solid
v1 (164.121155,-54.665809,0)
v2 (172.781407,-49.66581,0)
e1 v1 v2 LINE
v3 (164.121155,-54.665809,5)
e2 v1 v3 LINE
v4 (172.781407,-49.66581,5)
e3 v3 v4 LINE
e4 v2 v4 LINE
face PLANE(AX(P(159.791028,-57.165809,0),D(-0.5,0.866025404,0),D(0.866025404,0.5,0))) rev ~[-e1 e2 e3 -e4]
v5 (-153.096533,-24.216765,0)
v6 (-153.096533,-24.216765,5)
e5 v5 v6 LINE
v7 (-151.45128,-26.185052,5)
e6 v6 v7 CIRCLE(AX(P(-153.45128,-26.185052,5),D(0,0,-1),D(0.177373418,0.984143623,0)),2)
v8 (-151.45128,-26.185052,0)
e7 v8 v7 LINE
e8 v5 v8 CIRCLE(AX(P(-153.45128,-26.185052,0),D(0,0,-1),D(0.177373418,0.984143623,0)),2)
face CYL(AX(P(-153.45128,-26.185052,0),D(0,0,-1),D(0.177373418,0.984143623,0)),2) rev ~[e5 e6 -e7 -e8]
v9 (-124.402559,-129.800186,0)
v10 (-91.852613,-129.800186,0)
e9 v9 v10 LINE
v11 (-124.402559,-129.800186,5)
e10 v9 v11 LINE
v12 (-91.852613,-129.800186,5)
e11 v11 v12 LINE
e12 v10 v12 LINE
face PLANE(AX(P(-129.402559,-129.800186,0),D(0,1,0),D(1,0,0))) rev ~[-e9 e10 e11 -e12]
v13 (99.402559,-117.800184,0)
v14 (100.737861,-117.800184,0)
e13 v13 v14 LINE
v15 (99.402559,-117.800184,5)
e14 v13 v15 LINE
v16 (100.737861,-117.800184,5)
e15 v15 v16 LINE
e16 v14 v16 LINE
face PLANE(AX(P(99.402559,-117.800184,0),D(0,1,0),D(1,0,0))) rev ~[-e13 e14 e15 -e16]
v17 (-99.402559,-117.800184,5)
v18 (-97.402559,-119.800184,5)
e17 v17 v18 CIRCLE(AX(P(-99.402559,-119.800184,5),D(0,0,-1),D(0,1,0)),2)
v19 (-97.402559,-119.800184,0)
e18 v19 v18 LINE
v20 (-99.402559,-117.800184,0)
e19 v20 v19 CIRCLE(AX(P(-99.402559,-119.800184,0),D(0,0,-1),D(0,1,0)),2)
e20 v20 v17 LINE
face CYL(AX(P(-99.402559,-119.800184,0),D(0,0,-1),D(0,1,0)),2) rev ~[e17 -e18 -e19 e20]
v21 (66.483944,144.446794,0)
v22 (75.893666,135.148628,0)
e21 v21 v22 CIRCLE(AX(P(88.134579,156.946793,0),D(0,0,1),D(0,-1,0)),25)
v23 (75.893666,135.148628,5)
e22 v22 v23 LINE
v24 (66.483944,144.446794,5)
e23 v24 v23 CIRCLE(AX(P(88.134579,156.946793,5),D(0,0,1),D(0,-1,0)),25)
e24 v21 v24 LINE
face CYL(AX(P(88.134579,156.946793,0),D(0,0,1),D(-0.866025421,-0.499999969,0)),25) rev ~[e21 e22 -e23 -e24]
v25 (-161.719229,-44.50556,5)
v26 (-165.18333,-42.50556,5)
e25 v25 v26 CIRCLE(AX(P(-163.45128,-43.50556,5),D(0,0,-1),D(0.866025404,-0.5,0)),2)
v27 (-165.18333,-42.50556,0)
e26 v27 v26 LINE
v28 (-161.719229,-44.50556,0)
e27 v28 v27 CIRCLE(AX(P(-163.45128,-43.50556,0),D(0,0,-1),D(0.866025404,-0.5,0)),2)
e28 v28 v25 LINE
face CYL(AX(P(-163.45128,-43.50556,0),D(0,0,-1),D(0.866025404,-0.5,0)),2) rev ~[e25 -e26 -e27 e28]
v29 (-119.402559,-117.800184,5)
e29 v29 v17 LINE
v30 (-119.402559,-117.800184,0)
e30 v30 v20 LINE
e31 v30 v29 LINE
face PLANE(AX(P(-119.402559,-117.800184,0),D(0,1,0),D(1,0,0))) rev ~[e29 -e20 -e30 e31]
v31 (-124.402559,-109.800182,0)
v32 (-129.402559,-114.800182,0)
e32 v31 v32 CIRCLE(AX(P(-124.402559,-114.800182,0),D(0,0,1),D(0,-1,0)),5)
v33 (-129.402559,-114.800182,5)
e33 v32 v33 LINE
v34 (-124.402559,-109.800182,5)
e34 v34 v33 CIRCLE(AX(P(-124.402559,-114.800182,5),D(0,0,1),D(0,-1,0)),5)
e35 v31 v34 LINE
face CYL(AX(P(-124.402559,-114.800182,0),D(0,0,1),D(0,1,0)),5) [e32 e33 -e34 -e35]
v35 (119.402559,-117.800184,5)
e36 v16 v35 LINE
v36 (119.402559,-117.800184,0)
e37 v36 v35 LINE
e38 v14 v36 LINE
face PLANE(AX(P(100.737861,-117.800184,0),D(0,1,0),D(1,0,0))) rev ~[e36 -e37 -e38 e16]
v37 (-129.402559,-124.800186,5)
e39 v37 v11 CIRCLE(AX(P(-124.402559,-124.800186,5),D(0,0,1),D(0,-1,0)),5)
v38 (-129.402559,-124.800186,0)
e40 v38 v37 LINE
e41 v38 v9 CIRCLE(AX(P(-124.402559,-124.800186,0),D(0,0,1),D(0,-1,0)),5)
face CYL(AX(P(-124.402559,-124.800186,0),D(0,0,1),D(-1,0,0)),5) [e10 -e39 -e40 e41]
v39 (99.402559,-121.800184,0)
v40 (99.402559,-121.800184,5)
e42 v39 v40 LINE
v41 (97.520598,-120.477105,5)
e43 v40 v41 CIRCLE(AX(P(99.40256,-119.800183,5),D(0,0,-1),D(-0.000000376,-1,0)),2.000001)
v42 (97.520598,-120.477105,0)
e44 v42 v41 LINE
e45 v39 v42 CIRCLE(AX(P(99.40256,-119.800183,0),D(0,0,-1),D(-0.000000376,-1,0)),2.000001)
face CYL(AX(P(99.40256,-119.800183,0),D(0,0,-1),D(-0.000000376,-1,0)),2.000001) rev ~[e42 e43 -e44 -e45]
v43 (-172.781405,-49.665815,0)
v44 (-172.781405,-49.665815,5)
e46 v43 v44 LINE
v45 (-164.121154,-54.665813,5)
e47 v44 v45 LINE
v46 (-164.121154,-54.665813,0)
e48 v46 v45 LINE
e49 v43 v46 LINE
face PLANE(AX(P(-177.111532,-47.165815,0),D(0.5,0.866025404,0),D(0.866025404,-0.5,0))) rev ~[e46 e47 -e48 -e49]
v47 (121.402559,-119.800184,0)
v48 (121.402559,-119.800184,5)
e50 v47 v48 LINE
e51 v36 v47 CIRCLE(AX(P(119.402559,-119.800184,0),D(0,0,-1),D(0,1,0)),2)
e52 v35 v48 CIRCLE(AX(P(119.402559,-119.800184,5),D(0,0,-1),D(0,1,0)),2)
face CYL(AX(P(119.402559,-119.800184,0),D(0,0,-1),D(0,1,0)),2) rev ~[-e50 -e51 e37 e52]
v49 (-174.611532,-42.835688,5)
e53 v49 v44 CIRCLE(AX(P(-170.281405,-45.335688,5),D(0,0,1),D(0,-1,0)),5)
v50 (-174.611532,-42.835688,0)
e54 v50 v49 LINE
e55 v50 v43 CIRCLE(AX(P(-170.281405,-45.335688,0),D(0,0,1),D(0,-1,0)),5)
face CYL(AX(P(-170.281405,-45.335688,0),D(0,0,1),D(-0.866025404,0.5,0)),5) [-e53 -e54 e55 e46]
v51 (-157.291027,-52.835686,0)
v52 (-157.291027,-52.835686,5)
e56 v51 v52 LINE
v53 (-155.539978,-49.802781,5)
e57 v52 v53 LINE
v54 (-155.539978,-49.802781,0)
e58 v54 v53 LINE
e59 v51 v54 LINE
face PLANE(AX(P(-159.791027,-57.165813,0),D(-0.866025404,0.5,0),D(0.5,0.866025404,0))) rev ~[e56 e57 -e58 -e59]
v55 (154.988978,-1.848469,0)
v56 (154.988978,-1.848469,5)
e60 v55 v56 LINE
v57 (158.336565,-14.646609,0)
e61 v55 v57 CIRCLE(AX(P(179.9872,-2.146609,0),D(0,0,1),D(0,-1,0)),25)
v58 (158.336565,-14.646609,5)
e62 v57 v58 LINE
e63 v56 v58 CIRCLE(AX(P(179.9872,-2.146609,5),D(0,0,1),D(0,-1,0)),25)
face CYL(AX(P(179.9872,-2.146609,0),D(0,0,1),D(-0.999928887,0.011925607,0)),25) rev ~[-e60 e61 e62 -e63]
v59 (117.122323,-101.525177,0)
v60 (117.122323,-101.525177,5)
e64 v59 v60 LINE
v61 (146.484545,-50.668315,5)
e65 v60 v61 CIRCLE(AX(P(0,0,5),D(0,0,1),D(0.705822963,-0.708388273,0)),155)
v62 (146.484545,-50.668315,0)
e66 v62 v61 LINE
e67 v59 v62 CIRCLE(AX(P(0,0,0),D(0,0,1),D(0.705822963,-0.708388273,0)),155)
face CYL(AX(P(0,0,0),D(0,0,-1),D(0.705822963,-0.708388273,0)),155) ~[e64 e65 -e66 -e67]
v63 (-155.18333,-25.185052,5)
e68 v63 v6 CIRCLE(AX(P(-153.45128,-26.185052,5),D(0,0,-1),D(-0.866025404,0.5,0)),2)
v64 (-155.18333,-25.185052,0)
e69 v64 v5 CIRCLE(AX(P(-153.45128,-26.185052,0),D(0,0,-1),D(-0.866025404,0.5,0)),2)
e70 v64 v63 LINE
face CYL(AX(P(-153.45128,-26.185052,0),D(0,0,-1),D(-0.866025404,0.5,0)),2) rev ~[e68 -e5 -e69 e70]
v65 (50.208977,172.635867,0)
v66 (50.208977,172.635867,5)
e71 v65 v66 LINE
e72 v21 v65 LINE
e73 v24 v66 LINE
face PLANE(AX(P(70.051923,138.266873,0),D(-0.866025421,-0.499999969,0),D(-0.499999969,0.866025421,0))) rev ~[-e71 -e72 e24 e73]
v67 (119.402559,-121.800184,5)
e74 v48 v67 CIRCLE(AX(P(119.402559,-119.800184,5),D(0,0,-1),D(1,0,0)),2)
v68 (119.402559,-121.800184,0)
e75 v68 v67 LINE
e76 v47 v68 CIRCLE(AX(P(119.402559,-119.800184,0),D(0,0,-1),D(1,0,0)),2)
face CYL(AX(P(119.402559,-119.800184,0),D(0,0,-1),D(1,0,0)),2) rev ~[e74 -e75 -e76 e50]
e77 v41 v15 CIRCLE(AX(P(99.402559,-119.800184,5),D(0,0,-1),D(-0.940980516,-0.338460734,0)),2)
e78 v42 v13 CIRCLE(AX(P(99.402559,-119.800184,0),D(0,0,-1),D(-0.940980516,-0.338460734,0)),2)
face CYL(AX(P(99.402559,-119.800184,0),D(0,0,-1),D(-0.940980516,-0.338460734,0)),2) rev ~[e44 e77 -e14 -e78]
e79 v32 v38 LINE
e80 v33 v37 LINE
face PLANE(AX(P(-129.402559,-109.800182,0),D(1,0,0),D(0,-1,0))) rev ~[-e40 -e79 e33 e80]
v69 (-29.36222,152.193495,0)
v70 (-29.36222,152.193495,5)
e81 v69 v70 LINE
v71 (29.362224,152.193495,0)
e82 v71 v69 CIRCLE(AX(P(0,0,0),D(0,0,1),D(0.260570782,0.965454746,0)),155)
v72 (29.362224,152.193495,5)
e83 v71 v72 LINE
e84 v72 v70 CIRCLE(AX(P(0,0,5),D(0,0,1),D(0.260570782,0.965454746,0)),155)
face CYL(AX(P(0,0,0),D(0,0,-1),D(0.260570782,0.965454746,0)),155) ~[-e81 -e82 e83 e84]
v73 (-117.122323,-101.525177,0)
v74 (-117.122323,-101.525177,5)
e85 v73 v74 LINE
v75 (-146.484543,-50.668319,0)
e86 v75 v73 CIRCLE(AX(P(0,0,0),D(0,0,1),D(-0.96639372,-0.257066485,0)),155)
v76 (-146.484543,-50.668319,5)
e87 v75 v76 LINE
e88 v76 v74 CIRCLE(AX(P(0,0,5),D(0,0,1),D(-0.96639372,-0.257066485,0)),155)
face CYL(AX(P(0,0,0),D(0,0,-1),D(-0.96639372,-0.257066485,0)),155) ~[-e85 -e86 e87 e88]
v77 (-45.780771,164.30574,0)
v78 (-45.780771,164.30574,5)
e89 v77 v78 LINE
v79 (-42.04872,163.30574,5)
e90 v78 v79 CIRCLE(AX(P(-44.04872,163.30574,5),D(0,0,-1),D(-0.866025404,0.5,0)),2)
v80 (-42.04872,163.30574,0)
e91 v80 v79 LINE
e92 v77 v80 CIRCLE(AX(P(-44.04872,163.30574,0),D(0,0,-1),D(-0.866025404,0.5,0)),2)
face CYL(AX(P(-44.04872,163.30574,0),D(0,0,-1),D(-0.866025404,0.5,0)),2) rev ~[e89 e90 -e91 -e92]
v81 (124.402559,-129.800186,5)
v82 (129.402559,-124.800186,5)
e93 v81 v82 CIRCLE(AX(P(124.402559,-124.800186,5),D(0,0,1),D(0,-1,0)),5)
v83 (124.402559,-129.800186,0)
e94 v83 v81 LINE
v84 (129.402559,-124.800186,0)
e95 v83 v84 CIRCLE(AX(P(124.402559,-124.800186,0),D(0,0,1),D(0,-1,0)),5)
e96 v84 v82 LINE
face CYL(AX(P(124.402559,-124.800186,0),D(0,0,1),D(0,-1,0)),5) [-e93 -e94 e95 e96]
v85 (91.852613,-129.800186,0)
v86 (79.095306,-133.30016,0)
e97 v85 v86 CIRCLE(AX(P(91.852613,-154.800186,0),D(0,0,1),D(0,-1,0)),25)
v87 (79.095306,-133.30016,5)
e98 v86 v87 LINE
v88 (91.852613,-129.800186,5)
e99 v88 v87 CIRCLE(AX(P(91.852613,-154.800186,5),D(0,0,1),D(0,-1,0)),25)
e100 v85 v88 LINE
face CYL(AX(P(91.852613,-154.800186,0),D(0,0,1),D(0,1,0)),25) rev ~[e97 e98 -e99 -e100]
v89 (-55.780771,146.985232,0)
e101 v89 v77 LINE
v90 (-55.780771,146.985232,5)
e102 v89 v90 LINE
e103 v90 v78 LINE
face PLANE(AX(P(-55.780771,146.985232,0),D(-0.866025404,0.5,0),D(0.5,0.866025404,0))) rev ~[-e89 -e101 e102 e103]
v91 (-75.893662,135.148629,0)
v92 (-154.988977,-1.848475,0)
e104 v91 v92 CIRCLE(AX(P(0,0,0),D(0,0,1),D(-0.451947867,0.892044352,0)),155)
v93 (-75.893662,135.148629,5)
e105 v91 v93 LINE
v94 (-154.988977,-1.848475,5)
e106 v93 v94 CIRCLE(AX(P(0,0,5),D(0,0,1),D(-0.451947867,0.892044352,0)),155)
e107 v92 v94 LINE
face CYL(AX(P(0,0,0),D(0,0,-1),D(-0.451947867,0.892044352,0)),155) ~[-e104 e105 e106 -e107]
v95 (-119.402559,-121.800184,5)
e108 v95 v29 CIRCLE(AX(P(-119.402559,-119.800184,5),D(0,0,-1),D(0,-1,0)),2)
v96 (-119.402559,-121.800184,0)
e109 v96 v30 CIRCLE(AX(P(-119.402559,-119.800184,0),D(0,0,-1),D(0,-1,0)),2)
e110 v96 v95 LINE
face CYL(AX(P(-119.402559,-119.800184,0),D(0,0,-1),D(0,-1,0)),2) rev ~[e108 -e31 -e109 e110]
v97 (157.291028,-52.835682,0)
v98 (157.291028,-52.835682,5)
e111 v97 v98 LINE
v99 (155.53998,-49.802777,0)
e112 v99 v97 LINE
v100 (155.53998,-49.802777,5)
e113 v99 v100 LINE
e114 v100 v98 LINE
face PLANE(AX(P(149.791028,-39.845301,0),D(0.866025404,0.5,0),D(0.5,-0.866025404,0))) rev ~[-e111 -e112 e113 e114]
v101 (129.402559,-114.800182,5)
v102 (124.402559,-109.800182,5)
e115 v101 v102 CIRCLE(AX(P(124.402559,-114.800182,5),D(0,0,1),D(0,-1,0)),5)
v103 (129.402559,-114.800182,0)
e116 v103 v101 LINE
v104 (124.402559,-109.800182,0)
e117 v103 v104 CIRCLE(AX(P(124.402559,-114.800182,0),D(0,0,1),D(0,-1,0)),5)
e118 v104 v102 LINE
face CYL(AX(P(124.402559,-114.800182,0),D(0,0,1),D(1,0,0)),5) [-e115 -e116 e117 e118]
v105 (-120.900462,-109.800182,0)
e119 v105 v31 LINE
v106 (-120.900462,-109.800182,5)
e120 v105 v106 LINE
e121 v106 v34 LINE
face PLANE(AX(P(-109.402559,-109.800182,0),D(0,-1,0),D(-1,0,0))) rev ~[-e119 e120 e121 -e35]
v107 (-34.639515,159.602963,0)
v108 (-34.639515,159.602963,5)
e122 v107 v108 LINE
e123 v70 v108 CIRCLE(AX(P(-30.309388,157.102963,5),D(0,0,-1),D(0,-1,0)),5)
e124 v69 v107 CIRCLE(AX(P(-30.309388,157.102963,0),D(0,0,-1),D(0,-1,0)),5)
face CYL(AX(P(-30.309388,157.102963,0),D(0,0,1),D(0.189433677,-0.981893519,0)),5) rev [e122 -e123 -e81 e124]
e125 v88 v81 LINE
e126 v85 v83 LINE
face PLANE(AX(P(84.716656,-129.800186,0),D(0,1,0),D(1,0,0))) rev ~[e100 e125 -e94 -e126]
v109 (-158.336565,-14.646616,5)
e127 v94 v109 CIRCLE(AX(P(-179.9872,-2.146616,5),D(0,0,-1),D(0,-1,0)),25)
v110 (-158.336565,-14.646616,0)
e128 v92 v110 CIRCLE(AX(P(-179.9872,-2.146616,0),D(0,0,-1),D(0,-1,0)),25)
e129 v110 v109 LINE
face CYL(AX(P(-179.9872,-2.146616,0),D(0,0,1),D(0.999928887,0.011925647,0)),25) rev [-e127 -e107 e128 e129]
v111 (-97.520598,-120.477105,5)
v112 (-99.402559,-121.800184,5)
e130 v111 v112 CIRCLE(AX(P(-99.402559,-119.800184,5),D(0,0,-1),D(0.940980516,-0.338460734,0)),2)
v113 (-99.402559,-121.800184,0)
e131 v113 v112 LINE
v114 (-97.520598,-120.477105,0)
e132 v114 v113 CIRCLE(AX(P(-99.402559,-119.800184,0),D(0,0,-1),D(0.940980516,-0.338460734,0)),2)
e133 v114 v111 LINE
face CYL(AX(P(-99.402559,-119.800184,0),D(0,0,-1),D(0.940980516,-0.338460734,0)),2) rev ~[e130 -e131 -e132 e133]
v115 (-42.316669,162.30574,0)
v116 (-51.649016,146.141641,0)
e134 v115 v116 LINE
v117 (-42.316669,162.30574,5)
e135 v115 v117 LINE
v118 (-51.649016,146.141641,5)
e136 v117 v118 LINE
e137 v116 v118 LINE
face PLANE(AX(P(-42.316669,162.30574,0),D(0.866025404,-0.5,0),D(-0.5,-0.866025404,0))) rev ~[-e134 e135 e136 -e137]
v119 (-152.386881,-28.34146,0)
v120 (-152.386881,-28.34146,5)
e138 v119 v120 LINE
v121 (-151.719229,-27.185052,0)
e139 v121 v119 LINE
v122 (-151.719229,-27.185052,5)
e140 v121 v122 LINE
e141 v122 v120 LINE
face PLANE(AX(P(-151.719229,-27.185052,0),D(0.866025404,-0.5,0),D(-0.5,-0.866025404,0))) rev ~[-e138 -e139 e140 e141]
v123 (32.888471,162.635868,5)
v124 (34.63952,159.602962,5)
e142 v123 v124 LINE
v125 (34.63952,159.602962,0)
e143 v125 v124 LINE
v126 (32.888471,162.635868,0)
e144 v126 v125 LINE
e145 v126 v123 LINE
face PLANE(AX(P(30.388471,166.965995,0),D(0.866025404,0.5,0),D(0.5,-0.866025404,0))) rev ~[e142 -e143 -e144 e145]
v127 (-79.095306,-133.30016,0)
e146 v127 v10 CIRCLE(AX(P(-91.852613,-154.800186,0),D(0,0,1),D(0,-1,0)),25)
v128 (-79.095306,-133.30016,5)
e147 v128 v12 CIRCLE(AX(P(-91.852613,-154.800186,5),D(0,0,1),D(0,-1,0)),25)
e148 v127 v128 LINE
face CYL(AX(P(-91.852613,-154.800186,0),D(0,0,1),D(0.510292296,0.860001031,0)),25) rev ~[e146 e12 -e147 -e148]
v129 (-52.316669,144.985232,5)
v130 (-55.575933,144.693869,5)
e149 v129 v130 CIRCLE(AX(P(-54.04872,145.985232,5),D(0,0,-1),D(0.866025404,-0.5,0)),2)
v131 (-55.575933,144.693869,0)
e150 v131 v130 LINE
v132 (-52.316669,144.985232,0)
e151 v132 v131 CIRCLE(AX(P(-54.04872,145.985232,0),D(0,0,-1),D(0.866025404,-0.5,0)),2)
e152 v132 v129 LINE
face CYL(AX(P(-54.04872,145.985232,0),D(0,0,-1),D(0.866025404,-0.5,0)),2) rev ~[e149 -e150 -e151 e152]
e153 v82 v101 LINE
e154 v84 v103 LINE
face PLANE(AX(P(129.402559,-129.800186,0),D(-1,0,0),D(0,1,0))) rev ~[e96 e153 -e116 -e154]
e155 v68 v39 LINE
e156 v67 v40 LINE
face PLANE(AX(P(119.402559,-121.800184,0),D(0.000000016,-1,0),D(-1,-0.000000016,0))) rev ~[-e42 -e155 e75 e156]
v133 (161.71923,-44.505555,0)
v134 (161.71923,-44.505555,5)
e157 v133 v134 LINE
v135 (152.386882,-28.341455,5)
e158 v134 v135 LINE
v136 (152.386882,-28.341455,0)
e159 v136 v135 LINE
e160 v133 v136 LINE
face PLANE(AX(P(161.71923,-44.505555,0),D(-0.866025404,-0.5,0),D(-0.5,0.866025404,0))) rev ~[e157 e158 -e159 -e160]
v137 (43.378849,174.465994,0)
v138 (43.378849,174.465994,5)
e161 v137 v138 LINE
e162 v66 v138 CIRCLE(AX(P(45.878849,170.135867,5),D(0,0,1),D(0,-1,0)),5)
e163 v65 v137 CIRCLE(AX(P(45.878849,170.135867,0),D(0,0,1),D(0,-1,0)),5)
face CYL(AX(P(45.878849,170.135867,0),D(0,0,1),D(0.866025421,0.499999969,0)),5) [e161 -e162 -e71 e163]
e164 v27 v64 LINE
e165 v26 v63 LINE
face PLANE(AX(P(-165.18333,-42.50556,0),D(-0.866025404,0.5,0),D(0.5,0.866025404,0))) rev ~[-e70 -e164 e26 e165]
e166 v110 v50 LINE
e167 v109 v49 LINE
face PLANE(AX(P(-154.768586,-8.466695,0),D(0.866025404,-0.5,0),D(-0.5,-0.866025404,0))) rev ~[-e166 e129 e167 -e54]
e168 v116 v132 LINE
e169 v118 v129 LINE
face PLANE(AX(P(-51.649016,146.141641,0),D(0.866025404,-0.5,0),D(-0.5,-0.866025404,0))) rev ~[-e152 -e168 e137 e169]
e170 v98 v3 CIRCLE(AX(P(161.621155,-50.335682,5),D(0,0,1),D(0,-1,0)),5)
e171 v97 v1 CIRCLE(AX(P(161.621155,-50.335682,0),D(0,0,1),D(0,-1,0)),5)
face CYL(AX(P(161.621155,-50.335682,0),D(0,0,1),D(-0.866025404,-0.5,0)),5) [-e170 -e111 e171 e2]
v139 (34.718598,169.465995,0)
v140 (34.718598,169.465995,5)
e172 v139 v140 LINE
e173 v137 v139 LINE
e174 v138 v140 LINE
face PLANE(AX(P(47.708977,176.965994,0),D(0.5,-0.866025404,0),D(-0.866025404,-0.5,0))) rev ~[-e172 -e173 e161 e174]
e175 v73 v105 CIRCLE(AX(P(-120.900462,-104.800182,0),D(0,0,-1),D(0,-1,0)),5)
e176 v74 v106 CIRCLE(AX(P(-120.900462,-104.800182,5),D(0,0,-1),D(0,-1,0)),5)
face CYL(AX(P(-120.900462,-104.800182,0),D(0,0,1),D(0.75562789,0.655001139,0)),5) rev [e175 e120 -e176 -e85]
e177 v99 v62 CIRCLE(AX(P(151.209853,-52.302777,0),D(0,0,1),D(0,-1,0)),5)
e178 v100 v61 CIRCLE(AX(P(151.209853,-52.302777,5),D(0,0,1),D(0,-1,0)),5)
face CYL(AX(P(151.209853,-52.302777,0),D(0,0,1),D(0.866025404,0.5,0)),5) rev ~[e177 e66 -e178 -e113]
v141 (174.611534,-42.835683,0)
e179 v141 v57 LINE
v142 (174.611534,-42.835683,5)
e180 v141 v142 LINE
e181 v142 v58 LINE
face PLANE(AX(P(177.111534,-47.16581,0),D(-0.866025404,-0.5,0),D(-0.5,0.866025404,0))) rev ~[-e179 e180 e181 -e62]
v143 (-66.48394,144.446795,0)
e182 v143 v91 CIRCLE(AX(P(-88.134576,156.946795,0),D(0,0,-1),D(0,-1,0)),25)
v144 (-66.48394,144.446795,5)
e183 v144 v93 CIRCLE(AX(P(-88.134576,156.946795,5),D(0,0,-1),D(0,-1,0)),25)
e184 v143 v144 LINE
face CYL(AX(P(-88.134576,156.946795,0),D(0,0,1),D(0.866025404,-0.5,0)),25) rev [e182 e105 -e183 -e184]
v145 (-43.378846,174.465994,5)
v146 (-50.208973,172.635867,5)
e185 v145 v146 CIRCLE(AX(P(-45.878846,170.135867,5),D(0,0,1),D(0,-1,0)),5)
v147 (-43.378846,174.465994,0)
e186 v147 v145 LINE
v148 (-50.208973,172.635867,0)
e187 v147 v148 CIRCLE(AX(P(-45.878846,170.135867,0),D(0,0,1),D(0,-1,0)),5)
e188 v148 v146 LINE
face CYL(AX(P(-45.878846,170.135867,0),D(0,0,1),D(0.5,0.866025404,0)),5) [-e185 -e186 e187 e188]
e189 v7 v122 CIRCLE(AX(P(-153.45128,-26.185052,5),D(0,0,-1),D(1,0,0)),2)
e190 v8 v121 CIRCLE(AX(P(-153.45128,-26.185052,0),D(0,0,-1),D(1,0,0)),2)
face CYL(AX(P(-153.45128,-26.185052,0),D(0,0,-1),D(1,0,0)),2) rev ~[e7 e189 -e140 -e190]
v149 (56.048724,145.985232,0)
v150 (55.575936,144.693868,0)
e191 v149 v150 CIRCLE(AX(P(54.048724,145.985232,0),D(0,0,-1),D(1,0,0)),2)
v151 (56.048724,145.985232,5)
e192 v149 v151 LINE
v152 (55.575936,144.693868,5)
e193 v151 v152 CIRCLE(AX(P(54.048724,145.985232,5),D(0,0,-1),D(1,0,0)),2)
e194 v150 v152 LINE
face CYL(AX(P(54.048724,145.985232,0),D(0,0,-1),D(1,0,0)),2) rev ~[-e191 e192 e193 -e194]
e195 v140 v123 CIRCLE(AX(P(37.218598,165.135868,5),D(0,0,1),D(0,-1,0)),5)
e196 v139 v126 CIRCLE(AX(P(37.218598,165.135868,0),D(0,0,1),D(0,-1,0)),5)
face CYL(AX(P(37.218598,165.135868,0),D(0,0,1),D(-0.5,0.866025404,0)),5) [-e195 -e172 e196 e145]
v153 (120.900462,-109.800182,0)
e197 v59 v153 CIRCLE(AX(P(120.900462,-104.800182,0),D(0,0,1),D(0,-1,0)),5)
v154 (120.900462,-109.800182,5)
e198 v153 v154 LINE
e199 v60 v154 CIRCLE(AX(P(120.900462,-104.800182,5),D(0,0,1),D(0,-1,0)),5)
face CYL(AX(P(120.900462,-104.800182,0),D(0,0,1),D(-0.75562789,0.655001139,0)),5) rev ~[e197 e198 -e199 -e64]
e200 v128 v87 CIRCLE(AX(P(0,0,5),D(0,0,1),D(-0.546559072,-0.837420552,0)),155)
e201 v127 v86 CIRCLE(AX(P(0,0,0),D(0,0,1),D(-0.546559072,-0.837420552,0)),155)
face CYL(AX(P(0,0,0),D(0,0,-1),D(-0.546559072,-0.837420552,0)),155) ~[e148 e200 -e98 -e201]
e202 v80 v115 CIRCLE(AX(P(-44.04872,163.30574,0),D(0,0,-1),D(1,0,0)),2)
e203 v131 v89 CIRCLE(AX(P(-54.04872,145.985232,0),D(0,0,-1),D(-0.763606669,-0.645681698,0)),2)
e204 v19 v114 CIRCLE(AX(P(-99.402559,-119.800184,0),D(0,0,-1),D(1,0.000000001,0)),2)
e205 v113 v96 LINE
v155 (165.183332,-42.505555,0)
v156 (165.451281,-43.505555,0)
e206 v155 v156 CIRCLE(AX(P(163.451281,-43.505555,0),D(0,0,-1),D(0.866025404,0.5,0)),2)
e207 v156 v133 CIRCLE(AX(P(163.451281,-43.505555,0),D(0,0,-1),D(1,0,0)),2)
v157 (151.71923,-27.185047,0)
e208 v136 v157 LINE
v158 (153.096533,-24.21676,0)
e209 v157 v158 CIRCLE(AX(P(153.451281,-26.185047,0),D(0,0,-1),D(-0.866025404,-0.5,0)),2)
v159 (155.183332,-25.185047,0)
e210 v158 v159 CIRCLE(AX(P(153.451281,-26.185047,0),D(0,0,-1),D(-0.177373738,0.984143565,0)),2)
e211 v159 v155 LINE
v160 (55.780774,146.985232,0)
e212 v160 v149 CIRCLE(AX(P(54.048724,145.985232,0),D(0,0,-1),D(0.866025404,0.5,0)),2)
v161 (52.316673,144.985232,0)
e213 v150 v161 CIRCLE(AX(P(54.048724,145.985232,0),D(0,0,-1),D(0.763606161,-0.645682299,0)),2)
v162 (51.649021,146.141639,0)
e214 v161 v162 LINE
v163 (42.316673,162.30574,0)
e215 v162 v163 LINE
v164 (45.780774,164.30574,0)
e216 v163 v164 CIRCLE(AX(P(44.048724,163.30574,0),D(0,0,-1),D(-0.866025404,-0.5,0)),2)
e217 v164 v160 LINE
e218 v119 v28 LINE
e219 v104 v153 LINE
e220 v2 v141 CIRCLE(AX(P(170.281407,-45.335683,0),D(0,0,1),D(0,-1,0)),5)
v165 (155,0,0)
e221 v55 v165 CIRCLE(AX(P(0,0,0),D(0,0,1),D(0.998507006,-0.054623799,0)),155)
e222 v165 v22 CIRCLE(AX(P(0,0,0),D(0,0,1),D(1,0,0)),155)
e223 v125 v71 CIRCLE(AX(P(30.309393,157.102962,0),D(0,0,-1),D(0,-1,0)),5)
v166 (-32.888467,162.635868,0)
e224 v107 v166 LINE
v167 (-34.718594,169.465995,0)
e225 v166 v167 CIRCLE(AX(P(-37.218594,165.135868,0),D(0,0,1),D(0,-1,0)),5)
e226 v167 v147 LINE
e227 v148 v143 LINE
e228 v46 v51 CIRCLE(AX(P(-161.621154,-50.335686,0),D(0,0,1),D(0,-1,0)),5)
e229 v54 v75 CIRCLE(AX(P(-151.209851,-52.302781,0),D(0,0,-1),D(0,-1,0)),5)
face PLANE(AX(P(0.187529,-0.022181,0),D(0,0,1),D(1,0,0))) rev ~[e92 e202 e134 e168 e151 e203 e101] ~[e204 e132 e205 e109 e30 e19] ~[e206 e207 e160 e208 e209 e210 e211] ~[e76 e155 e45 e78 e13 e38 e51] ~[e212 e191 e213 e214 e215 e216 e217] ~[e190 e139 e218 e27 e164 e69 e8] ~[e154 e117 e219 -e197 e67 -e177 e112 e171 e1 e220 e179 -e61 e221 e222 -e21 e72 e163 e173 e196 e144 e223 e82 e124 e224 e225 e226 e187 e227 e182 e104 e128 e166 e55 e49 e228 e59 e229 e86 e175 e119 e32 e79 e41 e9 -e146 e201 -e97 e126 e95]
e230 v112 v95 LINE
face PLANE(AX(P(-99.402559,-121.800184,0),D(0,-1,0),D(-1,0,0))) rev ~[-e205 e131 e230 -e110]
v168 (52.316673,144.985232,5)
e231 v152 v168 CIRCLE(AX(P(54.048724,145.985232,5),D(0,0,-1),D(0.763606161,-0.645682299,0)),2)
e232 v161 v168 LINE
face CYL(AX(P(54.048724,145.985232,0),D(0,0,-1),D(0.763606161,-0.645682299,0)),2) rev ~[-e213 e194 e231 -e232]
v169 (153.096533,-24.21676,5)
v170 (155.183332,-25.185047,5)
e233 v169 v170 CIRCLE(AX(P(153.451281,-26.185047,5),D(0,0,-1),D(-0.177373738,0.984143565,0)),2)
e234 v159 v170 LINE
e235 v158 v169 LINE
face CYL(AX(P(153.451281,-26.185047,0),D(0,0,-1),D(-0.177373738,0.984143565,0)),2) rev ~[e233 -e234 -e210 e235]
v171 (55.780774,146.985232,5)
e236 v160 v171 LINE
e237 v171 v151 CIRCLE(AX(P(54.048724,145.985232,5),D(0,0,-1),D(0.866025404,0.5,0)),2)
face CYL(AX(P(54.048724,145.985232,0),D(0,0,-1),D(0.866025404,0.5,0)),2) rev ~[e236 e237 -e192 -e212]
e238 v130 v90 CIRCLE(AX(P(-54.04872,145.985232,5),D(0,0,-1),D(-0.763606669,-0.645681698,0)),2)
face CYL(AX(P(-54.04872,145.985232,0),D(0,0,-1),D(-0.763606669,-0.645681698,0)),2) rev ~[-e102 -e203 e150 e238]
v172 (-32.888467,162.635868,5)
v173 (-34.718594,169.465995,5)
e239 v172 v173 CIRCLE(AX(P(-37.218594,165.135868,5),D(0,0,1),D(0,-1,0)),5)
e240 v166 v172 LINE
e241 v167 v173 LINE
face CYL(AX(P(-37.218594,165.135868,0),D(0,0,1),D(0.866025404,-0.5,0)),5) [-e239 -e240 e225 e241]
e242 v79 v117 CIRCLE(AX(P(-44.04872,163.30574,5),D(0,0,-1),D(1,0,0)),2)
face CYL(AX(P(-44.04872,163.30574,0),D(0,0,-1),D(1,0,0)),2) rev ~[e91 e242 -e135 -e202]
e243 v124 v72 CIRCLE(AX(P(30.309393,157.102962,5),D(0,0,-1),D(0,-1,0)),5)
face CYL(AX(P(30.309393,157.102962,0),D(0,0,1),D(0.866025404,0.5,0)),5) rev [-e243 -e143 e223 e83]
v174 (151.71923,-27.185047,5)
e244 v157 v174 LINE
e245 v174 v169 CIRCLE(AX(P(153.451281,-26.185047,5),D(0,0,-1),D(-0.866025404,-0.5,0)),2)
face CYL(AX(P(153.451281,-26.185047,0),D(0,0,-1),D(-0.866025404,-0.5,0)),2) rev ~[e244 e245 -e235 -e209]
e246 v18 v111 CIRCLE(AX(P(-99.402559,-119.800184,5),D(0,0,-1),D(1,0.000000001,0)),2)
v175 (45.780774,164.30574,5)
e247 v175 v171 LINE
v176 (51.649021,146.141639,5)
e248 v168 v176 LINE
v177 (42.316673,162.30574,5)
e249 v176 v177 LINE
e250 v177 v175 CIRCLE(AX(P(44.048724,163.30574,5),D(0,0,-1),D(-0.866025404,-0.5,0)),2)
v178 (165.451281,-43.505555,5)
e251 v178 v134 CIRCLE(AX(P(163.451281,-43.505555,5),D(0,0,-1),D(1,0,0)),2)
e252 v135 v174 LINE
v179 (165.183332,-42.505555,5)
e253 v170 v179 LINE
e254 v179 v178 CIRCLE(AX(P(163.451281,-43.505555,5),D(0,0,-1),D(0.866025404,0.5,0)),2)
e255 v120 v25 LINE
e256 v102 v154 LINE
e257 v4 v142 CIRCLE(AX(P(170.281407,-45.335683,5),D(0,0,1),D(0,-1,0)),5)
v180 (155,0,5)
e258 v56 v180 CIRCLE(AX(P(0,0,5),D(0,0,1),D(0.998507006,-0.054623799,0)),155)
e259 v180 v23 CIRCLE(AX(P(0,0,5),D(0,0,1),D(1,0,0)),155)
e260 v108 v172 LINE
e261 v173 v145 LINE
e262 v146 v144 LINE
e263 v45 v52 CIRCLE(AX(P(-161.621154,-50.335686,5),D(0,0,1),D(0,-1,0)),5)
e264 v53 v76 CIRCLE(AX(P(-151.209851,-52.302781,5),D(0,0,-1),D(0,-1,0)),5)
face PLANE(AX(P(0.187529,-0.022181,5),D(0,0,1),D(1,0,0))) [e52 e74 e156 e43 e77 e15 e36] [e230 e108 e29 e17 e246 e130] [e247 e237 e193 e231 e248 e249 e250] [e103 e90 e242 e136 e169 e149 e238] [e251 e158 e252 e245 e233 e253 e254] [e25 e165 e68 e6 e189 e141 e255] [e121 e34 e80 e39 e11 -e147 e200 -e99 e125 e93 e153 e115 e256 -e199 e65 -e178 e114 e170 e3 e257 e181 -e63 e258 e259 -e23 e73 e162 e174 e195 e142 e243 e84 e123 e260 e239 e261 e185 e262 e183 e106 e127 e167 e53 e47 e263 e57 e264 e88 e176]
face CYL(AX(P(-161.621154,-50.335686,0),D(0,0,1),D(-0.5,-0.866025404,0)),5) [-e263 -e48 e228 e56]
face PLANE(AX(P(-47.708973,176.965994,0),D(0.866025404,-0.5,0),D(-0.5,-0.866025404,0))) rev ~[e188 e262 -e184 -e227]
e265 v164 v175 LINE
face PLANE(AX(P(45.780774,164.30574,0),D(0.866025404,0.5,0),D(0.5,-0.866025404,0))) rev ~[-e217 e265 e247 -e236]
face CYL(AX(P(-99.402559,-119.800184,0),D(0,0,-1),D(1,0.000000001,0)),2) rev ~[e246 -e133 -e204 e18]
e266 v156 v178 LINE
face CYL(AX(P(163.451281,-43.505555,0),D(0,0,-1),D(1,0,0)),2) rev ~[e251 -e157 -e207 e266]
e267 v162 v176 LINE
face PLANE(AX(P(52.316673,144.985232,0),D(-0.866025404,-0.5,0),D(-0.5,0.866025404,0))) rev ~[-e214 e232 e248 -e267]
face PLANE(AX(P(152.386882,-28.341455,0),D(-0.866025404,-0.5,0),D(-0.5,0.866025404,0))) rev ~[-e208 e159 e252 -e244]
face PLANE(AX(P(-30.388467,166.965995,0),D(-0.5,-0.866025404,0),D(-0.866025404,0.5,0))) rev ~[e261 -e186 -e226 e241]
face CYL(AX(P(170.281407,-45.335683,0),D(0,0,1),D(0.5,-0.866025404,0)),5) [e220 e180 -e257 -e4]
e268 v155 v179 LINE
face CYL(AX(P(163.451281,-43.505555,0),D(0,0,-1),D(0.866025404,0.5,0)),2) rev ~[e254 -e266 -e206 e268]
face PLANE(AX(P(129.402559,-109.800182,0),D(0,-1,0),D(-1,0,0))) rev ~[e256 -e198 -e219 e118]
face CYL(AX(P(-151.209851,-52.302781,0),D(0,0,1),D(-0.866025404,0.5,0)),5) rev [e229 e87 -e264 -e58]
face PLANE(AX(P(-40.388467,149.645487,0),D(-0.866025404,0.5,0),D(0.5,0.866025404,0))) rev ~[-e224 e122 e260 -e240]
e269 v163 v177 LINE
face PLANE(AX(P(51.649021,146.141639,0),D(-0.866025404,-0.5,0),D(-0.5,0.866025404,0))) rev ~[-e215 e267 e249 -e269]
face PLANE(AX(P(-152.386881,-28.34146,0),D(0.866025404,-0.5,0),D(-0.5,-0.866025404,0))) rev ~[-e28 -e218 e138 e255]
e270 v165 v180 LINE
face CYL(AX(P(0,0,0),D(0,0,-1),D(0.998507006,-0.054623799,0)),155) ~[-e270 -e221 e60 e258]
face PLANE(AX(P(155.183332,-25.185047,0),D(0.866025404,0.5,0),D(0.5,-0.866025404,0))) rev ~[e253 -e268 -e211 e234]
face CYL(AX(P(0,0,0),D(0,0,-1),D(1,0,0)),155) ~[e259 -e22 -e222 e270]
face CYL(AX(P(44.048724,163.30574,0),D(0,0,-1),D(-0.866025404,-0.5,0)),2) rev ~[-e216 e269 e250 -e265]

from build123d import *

# Parameters (mm, degrees)
F1_DEPTH = 5
F2_R     = 5
F3_R     = 5
F4_R     = 25


# Not quite as in the source:
# - ends of sketch curves that miss each other by under 0.0002 mm in the source are joined


with BuildPart() as f1:
    # F0 (on Top) → F1 (new body)
    with BuildSketch(Plane.XY):
        with BuildLine():
            ThreePointArc((154.7685858954, -8.4666888412), (154.9421356729, -4.2349253955), (155, 0))
            ThreePointArc((155, 0), (132.0663621555, 81.1386220428), (70.0519227484, 138.2668728194))
            ThreePointArc((70.0519227484, 138.2668728194), (62.8960752724, 141.6653934994), (55.5759359282, 144.6938676852))
            ThreePointArc((55.5759359282, 144.6938676852), (53.8706420703, 143.993176318), (52.3166727987, 144.9852322827))
            Line((52.3166727987, 144.9852322827), (51.6490211362, 146.1416388839))
            ThreePointArc((51.6490211362, 146.1416388839), (46.0520817915, 148.0006951425), (40.3884712615, 149.6454856959))
            ThreePointArc((40.3884712615, 149.6454856959), (2.3057e-06, 155), (-40.3884668093, 149.6454868975))
            ThreePointArc((-40.3884668093, 149.6454868975), (-46.0520770675, 148.0006966124), (-51.6490161547, 146.1416406444))
            Line((-51.6490161547, 146.1416406445), (-52.3166688853, 144.9852321932))
            ThreePointArc((-52.3166688853, 144.9852321932), (-53.8706389409, 143.9931761584), (-55.5759330313, 144.6938687979))
            ThreePointArc((-55.5759330313, 144.6938687979), (-62.8960721537, 141.665394884), (-70.0519194288, 138.2668745012))
            ThreePointArc((-70.0519194288, 138.2668745012), (-134.2339375866, 77.5), (-154.7685855343, -8.4666954414))
            ThreePointArc((-154.7685855343, -8.4666954414), (-154.1338668835, -16.3631011587), (-153.0965326665, -24.2167645548))
            ThreePointArc((-153.0965326665, -24.2167645548), (-151.9167610651, -24.9023775772), (-151.4512795032, -26.1850518006))
            ThreePointArc((-151.4512795032, -26.1850518006), (-151.5194278506, -26.7026898908), (-151.7192286956, -27.1850518006))
            Line((-151.7192286956, -27.1850518006), (-152.3868814262, -28.3414602518))
            ThreePointArc((-152.3868814262, -28.3414602518), (-151.1984015779, -34.1180796687), (-149.7910266196, -39.845305172))
            ThreePointArc((-149.7910266196, -39.845305172), (-134.2339373892, -77.500000342), (-109.4025592509, -109.8001822829))
            ThreePointArc((-109.4025592509, -109.8001822829), (-105.1463222254, -113.8826190535), (-100.7378611443, -117.800183922))
            Line((-100.7378611443, -117.8001839221), (-99.4025592509, -117.8001839221))
            ThreePointArc((-99.4025592509, -117.8001839221), (-97.9883456885, -118.3859703597), (-97.4025592509, -119.8001839221))
            ThreePointArc((-97.4025592509, -119.8001839221), (-97.4322899717, -120.143751918), (-97.5205982187, -120.4771053897))
            ThreePointArc((-97.5205982187, -120.4771053897), (-91.2377891853, -125.3022977626), (-84.7166561444, -129.8001855612))
            ThreePointArc((-84.7166561444, -129.8001855612), (0, -155), (84.7166561444, -129.8001855612))
            ThreePointArc((84.7166561444, -129.8001855612), (91.2377891853, -125.3022977626), (97.5205982187, -120.4771053897))
            ThreePointArc((97.5205982187, -120.4771053897), (97.7664292231, -118.6499324137), (99.4025592509, -117.8001839221))
            Line((99.4025592509, -117.8001839221), (100.7378611443, -117.8001839221))
            ThreePointArc((100.7378611443, -117.800183922), (105.1463222254, -113.8826190535), (109.4025592509, -109.8001822829))
            ThreePointArc((109.4025592509, -109.8001822829), (134.233938542, -77.4999983451), (149.791027805, -39.8453007155))
            ThreePointArc((149.791027805, -39.8453007155), (151.1984026669, -34.1180748426), (152.3868823923, -28.3414550574))
            Line((152.3868823923, -28.3414550574), (151.719230036, -27.1850472546))
            ThreePointArc((151.719230036, -27.1850472546), (151.6370691989, -25.3432419871), (153.0965333673, -24.2167601241))
            ThreePointArc((153.0965333673, -24.2167601241), (154.1338674692, -16.3630956418), (154.7685858954, -8.4666888412))
        make_face()
        with BuildLine():
            ThreePointArc((55.5759359282, 144.6938676852), (62.8960752724, 141.6653934994), (70.0519227484, 138.2668728194))
            Line((70.0519227484, 138.2668728194), (47.7089766448, 176.9659938193))
            Line((47.7089766448, 176.9659938193), (30.3884705677, 166.9659949732))
            Line((30.3884705677, 166.9659949732), (40.3884712615, 149.6454856959))
            ThreePointArc((40.3884712615, 149.6454856959), (46.0520817915, 148.0006951425), (51.6490211362, 146.1416388839))
            Line((51.6490211362, 146.1416388839), (42.3166727987, 162.3057403584))
            ThreePointArc((42.3166727987, 162.3057403584), (43.0487236063, 165.037791166), (45.7807744138, 164.3057403584))
            Line((45.7807744138, 164.3057403584), (55.7807744138, 146.9852322827))
            ThreePointArc((55.7807744138, 146.9852322827), (55.9805752588, 146.5028703729), (56.0487236063, 145.9852322827))
            ThreePointArc((56.0487236063, 145.9852322827), (55.9268110169, 145.2976367053), (55.5759359282, 144.6938676852))
        make_face()
        with BuildLine():
            Line((177.1115338821, -47.1658099451), (154.7685858954, -8.4666888412))
            ThreePointArc((154.7685858954, -8.4666888412), (154.1338674692, -16.3630956418), (153.0965333673, -24.2167601241))
            ThreePointArc((153.0965333673, -24.2167601241), (154.2930861111, -24.3708356099), (155.1833316512, -25.1850472546))
            Line((155.1833316512, -25.1850472546), (165.1833316512, -42.5055553303))
            ThreePointArc((165.1833316512, -42.5055553303), (165.3831324962, -42.9879172401), (165.4512808436, -43.5055553303))
            ThreePointArc((165.4512808436, -43.5055553303), (163.9689189338, -45.4374069829), (161.719230036, -44.5055553303))
            Line((161.719230036, -44.5055553303), (152.3868823923, -28.3414550574))
            ThreePointArc((152.3868823923, -28.3414550574), (151.1984026669, -34.1180748426), (149.791027805, -39.8453007155))
            Line((149.791027805, -39.8453007155), (159.791027805, -57.1658087912))
            Line((159.791027805, -57.1658087912), (177.1115338821, -47.1658099451))
        make_face()
        with BuildLine():
            ThreePointArc((-51.6490161547, 146.1416406444), (-46.0520770675, 148.0006966124), (-40.3884668093, 149.6454868975))
            Line((-40.3884668093, 149.6454868975), (-30.3884668093, 166.9659949732))
            Line((-30.3884668093, 166.9659949732), (-47.7089725764, 176.9659936403))
            Line((-47.7089725764, 176.9659936403), (-70.0519194288, 138.2668745012))
            ThreePointArc((-70.0519194288, 138.2668745012), (-62.8960721537, 141.665394884), (-55.5759330313, 144.6938687979))
            ThreePointArc((-55.5759330313, 144.6938687979), (-56.0407757277, 145.8071514412), (-55.7807705004, 146.9852321932))
            Line((-55.7807705004, 146.9852321932), (-45.7807705004, 164.3057402689))
            ThreePointArc((-45.7807705004, 164.3057402689), (-43.5310816027, 165.2375919215), (-42.0487196929, 163.3057402689))
            ThreePointArc((-42.0487196929, 163.3057402689), (-42.1168680403, 162.7881021787), (-42.3166688853, 162.3057402689))
            Line((-42.3166688853, 162.3057402689), (-51.6490161547, 146.1416406445))
        make_face()
        with BuildLine():
            Line((129.4025592509, -109.8001822829), (109.4025592509, -109.8001822829))
            ThreePointArc((109.4025592509, -109.8001822829), (105.1463222254, -113.8826190535), (100.7378611443, -117.800183922))
            Line((100.7378611443, -117.800183922), (119.4025592509, -117.8001839221))
            ThreePointArc((119.4025592509, -117.8001839221), (120.8167728132, -118.3859703597), (121.4025592509, -119.8001839221))
            ThreePointArc((121.4025592509, -119.8001839221), (120.8167728132, -121.2143974844), (119.4025592509, -121.8001839221))
            Line((119.4025592509, -121.8001839221), (99.4025592509, -121.8001842499))
            ThreePointArc((99.4025592509, -121.8001842499), (98.2523077425, -121.4363139498), (97.5205982187, -120.4771053897))
            ThreePointArc((97.5205982187, -120.4771053897), (91.2377891853, -125.3022977626), (84.7166561444, -129.8001855612))
            Line((84.7166561444, -129.8001855612), (129.4025592509, -129.8001855612))
            Line((129.4025592509, -129.8001855612), (129.4025592509, -109.8001822829))
        make_face()
        with BuildLine():
            ThreePointArc((-153.0965326665, -24.2167645548), (-154.1338668835, -16.3631011587), (-154.7685855343, -8.4666954414))
            Line((-154.7685855343, -8.4666954414), (-177.1115323867, -47.1658145805))
            Line((-177.1115323867, -47.1658145805), (-159.7910266196, -57.1658132477))
            Line((-159.7910266196, -57.1658132477), (-149.7910266196, -39.845305172))
            ThreePointArc((-149.7910266196, -39.845305172), (-151.1984015779, -34.1180796687), (-152.3868814262, -28.3414602518))
            Line((-152.3868814262, -28.3414602518), (-161.7192286956, -44.5055598762))
            ThreePointArc((-161.7192286956, -44.5055598762), (-164.4512795032, -45.2376106838), (-165.1833303107, -42.5055598762))
            Line((-165.1833303107, -42.5055598762), (-155.1833303107, -25.1850518006))
            ThreePointArc((-155.1833303107, -25.1850518006), (-154.2930850654, -24.3708402927), (-153.0965326665, -24.2167645548))
        make_face()
        with BuildLine():
            Line((-129.4025592509, -129.8001855612), (-84.7166561444, -129.8001855612))
            ThreePointArc((-84.7166561444, -129.8001855612), (-91.2377891853, -125.3022977626), (-97.5205982187, -120.4771053897))
            ThreePointArc((-97.5205982187, -120.4771053897), (-98.2523077425, -121.4363139498), (-99.4025592509, -121.8001839221))
            Line((-99.4025592509, -121.8001839221), (-119.4025592509, -121.8001839221))
            ThreePointArc((-119.4025592509, -121.8001839221), (-121.4025592509, -119.8001839221), (-119.4025592509, -117.8001839221))
            Line((-119.4025592509, -117.8001839221), (-100.7378611443, -117.8001839221))
            ThreePointArc((-100.7378611443, -117.800183922), (-105.1463222254, -113.8826190535), (-109.4025592509, -109.8001822829))
            Line((-109.4025592509, -109.8001822829), (-129.4025592509, -109.8001822829))
            Line((-129.4025592509, -109.8001822829), (-129.4025592509, -129.8001855612))
        make_face()
    extrude(amount=F1_DEPTH)

    # F2
    f2_edges = [f1.edges().sort_by_distance(p)[0] for p in [
        (-47.708973, 176.965994, 2.5),
        (-30.388467, 166.965995, 2.5),
        (30.388471, 166.965995, 2.5),
        (47.708977, 176.965994, 2.5),
        (177.111534, -47.16581, 2.5),
        (-177.111532, -47.165815, 2.5),
        (-129.402559, -109.800182, 2.5),
        (129.402559, -109.800182, 2.5),
        (159.791028, -57.165809, 2.5),
        (129.402559, -129.800186, 2.5),
        (-129.402559, -129.800186, 2.5),
        (-159.791027, -57.165813, 2.5),
    ]]
    fillet(f2_edges, radius=F2_R)

    # F3
    f3_edges = [f1.edges().sort_by_distance(p)[0] for p in [
        (-149.791027, -39.845305, 2.5),
        (149.791028, -39.845301, 2.5),
        (40.388471, 149.645486, 2.5),
        (-40.388467, 149.645487, 2.5),
        (-109.402559, -109.800182, 2.5),
        (109.402559, -109.800182, 2.5),
    ]]
    fillet(f3_edges, radius=F3_R)

    # F4
    f4_edges = [f1.edges().sort_by_distance(p)[0] for p in [
        (-70.051919, 138.266875, 2.5),
        (-154.768586, -8.466695, 2.5),
        (70.051923, 138.266873, 2.5),
        (154.768586, -8.466689, 2.5),
        (-84.716656, -129.800186, 2.5),
        (84.716656, -129.800186, 2.5),
    ]]
    fillet(f4_edges, radius=F4_R)


solid = f1.part
